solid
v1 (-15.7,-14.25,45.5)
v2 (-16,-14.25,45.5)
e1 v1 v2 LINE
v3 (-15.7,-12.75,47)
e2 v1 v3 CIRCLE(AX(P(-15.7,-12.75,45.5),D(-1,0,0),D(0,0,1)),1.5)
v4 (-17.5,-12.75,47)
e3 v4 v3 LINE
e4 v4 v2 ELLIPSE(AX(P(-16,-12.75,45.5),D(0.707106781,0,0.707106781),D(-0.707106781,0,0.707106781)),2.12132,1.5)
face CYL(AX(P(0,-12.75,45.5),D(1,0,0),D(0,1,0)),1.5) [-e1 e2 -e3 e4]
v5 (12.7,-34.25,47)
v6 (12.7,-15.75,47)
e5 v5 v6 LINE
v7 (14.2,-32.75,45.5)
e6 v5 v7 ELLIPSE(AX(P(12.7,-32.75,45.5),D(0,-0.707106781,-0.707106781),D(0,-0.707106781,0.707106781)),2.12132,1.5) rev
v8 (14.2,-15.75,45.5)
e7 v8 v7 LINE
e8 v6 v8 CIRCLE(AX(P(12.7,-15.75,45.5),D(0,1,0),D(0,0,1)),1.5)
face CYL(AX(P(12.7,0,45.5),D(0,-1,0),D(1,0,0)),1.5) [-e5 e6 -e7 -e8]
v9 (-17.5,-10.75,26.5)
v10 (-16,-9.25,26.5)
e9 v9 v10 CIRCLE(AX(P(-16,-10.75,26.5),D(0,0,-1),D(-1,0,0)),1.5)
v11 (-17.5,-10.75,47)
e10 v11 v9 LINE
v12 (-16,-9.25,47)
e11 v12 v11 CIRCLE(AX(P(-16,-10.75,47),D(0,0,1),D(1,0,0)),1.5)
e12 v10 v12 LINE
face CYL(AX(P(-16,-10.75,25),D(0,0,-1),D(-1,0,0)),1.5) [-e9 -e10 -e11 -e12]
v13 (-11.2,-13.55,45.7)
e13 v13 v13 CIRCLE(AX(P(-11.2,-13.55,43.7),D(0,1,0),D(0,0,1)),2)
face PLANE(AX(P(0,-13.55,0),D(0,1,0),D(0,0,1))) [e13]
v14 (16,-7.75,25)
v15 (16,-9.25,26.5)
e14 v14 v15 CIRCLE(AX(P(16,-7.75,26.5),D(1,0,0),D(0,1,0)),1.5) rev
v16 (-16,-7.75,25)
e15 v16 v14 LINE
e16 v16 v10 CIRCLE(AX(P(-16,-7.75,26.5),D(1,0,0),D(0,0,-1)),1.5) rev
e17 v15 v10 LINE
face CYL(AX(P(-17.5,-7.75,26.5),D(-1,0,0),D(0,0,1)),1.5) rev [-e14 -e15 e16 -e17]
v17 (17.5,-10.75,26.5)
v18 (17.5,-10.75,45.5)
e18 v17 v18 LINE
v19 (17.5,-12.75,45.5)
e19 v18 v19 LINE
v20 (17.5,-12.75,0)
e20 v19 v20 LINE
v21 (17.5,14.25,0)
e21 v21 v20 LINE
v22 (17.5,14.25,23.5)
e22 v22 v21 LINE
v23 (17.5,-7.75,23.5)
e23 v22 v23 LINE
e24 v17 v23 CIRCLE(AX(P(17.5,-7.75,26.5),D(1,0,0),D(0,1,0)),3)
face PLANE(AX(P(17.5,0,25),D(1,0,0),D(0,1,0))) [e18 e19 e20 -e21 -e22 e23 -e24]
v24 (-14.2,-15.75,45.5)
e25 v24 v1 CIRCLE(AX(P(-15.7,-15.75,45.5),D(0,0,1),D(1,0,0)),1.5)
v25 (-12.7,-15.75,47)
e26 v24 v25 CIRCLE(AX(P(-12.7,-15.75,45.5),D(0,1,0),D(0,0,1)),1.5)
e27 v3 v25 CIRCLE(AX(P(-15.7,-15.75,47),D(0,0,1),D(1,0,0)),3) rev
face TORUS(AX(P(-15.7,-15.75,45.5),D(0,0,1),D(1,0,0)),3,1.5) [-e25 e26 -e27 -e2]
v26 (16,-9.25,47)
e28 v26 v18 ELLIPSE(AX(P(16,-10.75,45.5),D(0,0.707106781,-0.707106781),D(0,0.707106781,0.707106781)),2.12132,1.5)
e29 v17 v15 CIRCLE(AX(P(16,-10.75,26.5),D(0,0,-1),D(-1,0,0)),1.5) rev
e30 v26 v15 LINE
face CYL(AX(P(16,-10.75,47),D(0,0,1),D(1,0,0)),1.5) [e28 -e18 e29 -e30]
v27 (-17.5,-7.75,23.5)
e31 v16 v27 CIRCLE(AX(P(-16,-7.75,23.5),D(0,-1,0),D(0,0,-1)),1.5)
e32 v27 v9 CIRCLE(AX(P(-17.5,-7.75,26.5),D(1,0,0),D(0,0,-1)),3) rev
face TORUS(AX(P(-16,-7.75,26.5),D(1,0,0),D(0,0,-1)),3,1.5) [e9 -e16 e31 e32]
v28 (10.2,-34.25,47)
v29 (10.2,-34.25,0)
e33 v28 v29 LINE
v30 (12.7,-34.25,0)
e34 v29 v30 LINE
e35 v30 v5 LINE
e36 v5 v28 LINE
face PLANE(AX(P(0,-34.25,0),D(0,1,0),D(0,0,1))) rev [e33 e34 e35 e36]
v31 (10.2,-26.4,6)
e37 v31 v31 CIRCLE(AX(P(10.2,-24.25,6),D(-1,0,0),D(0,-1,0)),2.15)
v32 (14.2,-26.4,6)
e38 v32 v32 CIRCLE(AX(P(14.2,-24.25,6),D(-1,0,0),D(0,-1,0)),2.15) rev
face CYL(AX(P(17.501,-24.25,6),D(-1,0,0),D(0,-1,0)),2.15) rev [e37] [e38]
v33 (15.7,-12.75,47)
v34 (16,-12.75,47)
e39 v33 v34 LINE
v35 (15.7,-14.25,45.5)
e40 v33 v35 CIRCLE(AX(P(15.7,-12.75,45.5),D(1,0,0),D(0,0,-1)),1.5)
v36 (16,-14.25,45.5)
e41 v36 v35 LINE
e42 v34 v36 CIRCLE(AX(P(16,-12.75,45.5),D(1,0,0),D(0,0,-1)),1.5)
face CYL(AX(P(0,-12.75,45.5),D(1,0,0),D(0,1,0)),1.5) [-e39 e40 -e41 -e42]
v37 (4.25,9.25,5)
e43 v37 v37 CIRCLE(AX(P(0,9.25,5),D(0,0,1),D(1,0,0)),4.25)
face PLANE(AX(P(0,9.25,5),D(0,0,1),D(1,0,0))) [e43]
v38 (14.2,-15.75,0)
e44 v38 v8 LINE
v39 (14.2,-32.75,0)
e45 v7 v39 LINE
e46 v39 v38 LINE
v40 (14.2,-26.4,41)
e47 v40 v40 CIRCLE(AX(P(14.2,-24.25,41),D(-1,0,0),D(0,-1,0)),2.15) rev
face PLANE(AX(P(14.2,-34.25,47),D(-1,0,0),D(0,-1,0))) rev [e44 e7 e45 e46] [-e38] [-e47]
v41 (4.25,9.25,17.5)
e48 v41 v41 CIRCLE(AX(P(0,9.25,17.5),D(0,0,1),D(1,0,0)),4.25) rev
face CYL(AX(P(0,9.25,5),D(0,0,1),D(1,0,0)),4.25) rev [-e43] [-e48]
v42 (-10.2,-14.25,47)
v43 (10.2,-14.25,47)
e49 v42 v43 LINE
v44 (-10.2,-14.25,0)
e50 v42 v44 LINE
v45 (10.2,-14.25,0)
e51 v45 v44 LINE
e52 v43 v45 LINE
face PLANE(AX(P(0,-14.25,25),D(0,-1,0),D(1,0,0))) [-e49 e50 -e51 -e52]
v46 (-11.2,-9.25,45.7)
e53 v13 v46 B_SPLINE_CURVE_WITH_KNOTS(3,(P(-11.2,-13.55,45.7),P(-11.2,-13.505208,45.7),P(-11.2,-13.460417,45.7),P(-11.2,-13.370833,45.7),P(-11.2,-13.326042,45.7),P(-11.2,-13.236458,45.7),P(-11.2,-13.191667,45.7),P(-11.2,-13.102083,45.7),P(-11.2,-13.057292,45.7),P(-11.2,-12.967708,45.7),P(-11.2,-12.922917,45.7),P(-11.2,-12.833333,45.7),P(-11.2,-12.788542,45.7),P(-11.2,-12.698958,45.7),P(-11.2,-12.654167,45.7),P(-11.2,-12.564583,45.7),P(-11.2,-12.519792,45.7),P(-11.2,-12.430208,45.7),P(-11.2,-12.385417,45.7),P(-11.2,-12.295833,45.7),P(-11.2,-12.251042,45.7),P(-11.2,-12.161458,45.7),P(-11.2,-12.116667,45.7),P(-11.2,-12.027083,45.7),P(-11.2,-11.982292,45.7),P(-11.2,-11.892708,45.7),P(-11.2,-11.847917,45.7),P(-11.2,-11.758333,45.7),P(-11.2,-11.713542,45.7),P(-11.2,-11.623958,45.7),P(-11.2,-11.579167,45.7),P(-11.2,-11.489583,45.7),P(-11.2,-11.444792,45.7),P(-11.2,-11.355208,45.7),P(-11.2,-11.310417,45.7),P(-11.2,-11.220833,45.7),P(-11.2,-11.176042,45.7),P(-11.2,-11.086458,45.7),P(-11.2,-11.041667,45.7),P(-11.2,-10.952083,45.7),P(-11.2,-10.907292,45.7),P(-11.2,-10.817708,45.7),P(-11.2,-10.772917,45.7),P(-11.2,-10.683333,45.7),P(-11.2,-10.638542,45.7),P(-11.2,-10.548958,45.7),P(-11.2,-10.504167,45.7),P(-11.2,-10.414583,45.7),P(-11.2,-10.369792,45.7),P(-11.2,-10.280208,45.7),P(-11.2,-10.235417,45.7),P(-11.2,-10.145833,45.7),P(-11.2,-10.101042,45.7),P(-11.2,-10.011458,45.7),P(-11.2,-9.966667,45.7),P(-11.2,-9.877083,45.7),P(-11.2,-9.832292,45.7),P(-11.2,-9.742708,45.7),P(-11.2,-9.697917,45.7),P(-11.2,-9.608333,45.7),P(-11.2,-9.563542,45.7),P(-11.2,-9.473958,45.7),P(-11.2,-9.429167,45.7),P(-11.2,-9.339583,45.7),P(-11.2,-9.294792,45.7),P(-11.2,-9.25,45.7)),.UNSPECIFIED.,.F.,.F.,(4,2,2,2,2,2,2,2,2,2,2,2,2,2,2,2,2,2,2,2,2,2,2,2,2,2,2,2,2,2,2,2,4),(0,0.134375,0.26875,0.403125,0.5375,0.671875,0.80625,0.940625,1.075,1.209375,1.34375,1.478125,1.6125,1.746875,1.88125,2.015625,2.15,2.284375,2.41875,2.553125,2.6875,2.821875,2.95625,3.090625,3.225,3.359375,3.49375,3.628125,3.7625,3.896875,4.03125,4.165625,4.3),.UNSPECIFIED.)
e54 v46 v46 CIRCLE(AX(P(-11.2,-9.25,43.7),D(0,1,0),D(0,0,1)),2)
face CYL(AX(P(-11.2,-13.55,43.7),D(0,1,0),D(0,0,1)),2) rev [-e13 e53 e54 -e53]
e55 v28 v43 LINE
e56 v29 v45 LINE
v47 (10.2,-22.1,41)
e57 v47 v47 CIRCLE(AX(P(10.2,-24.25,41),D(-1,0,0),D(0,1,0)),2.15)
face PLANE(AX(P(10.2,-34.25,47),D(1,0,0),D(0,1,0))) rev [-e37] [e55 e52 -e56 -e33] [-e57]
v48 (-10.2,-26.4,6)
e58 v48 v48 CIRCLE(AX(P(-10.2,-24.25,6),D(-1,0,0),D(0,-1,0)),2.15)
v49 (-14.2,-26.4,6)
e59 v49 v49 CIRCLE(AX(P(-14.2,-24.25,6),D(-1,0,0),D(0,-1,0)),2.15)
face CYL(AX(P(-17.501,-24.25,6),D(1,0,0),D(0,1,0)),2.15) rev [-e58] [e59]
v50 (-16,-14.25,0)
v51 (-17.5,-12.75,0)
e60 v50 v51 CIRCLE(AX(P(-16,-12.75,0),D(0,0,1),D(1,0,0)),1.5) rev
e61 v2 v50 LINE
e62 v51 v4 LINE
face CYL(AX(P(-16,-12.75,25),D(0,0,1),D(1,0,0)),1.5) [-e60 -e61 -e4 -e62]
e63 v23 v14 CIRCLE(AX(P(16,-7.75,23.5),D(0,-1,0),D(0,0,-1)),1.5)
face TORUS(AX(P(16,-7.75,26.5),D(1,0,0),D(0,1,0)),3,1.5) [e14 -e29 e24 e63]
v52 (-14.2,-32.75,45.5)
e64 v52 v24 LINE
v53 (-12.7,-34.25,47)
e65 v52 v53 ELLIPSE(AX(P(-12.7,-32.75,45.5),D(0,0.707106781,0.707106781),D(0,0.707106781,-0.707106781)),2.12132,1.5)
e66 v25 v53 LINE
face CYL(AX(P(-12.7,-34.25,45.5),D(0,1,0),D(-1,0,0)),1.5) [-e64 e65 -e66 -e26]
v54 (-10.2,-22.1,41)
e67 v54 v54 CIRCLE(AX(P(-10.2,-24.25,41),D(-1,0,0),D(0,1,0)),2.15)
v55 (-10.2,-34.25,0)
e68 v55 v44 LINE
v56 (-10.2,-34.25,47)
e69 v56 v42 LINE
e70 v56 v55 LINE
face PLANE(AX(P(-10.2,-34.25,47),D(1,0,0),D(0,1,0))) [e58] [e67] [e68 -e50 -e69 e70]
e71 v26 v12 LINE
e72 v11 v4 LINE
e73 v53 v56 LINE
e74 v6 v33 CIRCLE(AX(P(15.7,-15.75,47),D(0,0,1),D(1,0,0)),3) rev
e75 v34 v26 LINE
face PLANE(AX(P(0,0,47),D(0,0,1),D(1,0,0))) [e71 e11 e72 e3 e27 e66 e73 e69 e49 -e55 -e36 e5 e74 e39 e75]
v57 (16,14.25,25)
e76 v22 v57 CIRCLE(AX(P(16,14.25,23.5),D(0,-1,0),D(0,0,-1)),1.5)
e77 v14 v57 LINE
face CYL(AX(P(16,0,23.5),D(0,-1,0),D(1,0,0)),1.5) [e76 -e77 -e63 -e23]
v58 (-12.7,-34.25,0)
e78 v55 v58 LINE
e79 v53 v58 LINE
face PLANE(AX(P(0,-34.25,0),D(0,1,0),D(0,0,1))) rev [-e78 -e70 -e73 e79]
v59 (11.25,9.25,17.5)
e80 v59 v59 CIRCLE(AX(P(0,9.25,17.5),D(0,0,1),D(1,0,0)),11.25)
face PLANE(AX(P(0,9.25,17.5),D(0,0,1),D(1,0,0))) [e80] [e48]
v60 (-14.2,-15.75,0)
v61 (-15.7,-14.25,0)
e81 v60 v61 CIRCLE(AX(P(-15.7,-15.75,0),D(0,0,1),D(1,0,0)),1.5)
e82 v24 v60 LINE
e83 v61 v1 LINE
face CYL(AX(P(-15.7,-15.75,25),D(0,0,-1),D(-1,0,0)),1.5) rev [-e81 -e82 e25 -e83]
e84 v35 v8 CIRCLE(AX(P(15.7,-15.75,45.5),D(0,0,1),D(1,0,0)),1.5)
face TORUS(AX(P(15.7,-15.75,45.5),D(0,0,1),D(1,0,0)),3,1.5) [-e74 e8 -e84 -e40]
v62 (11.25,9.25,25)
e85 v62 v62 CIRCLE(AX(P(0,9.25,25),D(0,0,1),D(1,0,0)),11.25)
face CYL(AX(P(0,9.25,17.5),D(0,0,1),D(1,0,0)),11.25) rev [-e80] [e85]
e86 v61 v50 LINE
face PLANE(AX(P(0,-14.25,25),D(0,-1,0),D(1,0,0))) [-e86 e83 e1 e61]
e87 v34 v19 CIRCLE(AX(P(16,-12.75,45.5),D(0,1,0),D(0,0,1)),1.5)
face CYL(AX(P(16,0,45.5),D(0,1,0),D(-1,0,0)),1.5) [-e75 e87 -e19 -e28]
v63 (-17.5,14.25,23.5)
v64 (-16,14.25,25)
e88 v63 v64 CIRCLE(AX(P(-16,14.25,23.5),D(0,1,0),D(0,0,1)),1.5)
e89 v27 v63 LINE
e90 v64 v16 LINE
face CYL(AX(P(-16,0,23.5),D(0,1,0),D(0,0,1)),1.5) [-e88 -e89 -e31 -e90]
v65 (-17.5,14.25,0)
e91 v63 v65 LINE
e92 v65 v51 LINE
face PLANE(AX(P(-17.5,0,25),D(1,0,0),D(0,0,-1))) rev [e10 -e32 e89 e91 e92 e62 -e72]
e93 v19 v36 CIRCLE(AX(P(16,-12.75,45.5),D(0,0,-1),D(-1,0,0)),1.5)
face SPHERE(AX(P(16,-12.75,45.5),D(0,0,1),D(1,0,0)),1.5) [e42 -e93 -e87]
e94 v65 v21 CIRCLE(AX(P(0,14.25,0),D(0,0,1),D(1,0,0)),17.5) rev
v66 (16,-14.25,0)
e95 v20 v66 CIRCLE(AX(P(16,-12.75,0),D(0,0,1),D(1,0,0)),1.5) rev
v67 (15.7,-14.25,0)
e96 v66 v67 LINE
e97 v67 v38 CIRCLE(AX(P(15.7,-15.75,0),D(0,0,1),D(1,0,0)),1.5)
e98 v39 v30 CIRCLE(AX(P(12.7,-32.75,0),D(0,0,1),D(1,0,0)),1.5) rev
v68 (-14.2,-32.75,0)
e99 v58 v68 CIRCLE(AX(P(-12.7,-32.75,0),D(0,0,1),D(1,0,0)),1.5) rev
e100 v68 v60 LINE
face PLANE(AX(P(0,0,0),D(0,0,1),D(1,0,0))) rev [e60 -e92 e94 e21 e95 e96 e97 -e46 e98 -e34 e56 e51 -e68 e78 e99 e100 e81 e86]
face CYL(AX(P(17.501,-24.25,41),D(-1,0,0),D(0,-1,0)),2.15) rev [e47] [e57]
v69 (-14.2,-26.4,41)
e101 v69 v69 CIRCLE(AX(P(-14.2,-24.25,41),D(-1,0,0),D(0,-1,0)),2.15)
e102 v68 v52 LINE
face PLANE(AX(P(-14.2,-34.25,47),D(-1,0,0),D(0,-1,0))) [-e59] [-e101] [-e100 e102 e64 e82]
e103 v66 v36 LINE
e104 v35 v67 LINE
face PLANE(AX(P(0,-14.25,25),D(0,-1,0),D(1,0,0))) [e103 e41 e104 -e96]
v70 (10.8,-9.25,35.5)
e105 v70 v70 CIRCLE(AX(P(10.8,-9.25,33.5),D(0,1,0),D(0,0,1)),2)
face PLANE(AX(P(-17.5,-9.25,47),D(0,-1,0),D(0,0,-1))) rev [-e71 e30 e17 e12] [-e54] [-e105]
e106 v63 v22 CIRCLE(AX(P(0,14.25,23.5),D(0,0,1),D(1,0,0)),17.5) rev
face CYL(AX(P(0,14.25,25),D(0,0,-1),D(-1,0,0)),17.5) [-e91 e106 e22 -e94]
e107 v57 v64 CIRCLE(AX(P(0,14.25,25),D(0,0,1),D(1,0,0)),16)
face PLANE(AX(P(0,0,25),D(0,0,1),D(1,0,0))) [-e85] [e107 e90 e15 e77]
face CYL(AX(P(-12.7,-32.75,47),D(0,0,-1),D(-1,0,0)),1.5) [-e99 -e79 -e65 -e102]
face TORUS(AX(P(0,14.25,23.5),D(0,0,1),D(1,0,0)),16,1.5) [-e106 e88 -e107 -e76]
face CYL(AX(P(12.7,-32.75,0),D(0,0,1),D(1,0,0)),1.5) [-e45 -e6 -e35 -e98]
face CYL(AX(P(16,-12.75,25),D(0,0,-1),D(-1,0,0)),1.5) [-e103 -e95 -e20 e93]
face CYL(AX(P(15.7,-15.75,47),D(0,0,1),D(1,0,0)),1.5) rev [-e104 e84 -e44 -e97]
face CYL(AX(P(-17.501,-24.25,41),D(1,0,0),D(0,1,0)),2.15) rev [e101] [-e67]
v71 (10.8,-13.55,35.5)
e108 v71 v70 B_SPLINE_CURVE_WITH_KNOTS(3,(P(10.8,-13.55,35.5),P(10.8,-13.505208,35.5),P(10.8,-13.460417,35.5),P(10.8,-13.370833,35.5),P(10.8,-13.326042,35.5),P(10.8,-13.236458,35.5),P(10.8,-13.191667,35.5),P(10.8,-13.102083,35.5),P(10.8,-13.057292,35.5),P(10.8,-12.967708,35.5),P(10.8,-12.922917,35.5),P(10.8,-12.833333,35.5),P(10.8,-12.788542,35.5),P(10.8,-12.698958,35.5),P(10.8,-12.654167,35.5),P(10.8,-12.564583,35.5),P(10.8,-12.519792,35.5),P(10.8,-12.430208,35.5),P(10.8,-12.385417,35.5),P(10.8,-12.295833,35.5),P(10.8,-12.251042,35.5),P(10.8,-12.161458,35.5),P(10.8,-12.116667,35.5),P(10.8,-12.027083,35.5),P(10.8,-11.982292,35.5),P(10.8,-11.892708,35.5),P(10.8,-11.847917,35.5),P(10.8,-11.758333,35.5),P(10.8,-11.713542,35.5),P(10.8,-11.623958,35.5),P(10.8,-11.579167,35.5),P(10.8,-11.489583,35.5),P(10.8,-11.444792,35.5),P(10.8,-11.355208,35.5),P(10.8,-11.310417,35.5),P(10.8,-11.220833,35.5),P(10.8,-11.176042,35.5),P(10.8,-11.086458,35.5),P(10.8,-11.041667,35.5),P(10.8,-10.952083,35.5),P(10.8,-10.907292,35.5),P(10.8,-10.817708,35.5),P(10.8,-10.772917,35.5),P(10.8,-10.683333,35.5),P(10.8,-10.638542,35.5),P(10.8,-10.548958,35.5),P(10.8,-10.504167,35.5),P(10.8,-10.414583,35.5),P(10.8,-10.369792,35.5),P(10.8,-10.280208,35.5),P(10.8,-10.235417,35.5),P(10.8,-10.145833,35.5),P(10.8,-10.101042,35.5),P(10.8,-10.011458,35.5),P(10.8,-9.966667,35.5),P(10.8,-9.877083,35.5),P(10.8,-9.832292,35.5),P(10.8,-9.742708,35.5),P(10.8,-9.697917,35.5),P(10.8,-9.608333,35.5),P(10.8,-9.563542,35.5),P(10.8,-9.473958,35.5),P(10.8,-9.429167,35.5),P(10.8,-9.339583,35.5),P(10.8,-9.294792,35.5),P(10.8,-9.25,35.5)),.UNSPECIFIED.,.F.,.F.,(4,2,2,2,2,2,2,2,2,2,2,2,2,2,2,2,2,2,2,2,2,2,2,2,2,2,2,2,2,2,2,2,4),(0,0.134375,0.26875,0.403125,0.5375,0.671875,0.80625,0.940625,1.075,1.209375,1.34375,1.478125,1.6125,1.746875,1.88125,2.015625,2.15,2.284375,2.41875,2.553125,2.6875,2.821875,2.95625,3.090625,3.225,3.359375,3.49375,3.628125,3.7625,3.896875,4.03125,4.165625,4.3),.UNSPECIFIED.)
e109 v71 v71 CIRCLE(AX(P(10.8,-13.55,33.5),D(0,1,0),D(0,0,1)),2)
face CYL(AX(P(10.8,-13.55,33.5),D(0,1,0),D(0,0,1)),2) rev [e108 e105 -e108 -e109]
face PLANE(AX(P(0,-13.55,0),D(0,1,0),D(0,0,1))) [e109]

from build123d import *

# Parameters (mm, degrees)
SKETCH1_W           = 35
SKETCH1_H           = 28.5
BOSS_EXTRUDE1_DEPTH = 25
SKETCH2_R           = 4.25
CUT_EXTRUDE1_DEPTH  = 20
SKETCH3_R           = 11.25
CUT_EXTRUDE2_DEPTH  = 7.5
SKETCH9_W           = 35
SKETCH9_H           = 5
BOSS_EXTRUDE4_DEPTH = 22
SKETCH4_W           = 4
SKETCH4_H           = 47
BOSS_EXTRUDE2_DEPTH = 20
FILLET1_R           = 1.5
CUT_EXTRUDE3_REACH  = 66.415
SKETCH6_R           = 2.15
MIRROR1_START       = -14.2
MIRROR1_OUTLINE_W   = 20
MIRROR1_OUTLINE_H   = 47
MIRROR1_OUTLINE_R   = 2.15
MIRROR1_DEPTH       = 4
MIRROR1_2_DEPTH     = 47
FILLET2_R           = 1.5
SKETCH10_R          = 2
CUT_EXTRUDE4_DEPTH  = 4.3


with BuildPart() as part:
    # Sketch1 → Boss-Extrude1 (new body)
    with BuildSketch(Plane.XY):
        with BuildLine():
            ThreePointArc((-17.5, 14.25), (0, 31.75), (17.5, 14.25))
            Line((17.5, 14.25), (-17.5, 14.25))
        make_face()
        Rectangle(SKETCH1_W, SKETCH1_H)
    extrude(amount=BOSS_EXTRUDE1_DEPTH)

    # Sketch2 → Cut-Extrude1 (cut)
    with BuildSketch(Plane.XY.offset(25)):
        with Locations((0, 9.25)):
            Circle(SKETCH2_R)
    extrude(amount=-CUT_EXTRUDE1_DEPTH, mode=Mode.SUBTRACT)

    # Sketch3 → Cut-Extrude2 (cut)
    with BuildSketch(Plane.XY.offset(25)):
        with Locations((0, 9.25)):
            Circle(SKETCH3_R)
    extrude(amount=-CUT_EXTRUDE2_DEPTH, mode=Mode.SUBTRACT)

    # Sketch9 → Boss-Extrude4 (add)
    with BuildSketch(Plane.XY.offset(25)):
        with Locations((0, -11.75)):
            Rectangle(SKETCH9_W, SKETCH9_H)
    extrude(amount=BOSS_EXTRUDE4_DEPTH)

    # Sketch4 → Boss-Extrude2 (add)
    with BuildSketch(Plane.XZ.offset(14.25)):
        with Locations((12.2, 23.5)):
            Rectangle(SKETCH4_W, SKETCH4_H)
    extrude(amount=BOSS_EXTRUDE2_DEPTH)

    # Fillet1
    fillet1_edges = [part.edges().sort_by_distance(p)[0] for p in [
        (14.2, -14.25, 23.5),
        (17.5, -14.25, 23.5),
    ]]
    fillet(fillet1_edges, radius=FILLET1_R)

    # Sketch6 → Cut-Extrude3 (cut, up to next)
    with BuildSketch(Plane.ZY.offset(-10.2), mode=Mode.PRIVATE) as cut_extrude3_sk1:
        with Locations(Location((6, -24.25, 0), (0, 0, 270))):
            Circle(SKETCH6_R)
    cut_extrude3_tool1 = extrude(cut_extrude3_sk1.sketch, amount=-CUT_EXTRUDE3_REACH, mode=Mode.PRIVATE) & part.part
    # Sketch6 → Cut-Extrude3 (cut, up to next)
    with BuildSketch(Plane.ZY.offset(-10.2), mode=Mode.PRIVATE) as cut_extrude3_sk2:
        with Locations(Location((41, -24.25, 0), (0, 0, 270))):
            Circle(SKETCH6_R)
    cut_extrude3_tool2 = extrude(cut_extrude3_sk2.sketch, amount=-CUT_EXTRUDE3_REACH, mode=Mode.PRIVATE) & part.part
    add(cut_extrude3_tool1.solids().sort_by_distance((10.2, -24.25, 6))[0], mode=Mode.SUBTRACT)
    add(cut_extrude3_tool2.solids().sort_by_distance((10.2, -24.25, 41))[0], mode=Mode.SUBTRACT)

    # Mirror1: read off the stored shape, not the designer's step
    # Mirror1 outline → Mirror1 (add)
    with BuildSketch(Plane.YZ.offset(MIRROR1_START)):
        with Locations((-24.25, 23.5)):
            Rectangle(MIRROR1_OUTLINE_W, MIRROR1_OUTLINE_H)
        with Locations((-24.25, 6)):
            Circle(MIRROR1_OUTLINE_R, mode=Mode.SUBTRACT)
        with Locations((-24.25, 41)):
            Circle(MIRROR1_OUTLINE_R, mode=Mode.SUBTRACT)
    extrude(amount=MIRROR1_DEPTH)

    # Mirror1 2 outline → Mirror1 2 (add)
    with BuildSketch(Plane.XY):
        with BuildLine():
            Line((-14.2, -14.25), (-15.7, -14.25))
            ThreePointArc((-15.7, -14.25), (-14.639339828, -14.689339828), (-14.2, -15.75))
            Line((-14.2, -15.75), (-14.2, -14.25))
        make_face()
    extrude(amount=MIRROR1_2_DEPTH)

    # Fillet2
    fillet2_edges = [part.edges().sort_by_distance(p)[0] for p in [
        (-17.5, 2.5, 25),
        (17.5, 2.5, 25),
        (-17.5, -9.25, 36),
        (0, -9.25, 25),
        (17.5, -9.25, 36),
        (-16.6, -14.25, 47),
        (14.2, -25, 47),
        (14.2, -34.25, 23.5),
        (0, 31.75, 25),
        (17.5, -11, 47),
        (15.85, -14.25, 47),
        (17.060660172, -13.810660172, 47),
        (14.639339828, -14.689339828, 47),
        (-14.2, -34.25, 23.5),
        (-14.2, -25, 47),
        (-14.639339828, -14.689339828, 47),
        (-17.5, -14.25, 23.5),
    ]]
    fillet(fillet2_edges, radius=FILLET2_R)

    # Sketch10 → Cut-Extrude4 (cut)
    with BuildSketch(Plane(origin=(0, -9.25, 0), x_dir=(1, 0, 0), z_dir=(0, 1, 0))):
        with Locations(Location((10.8, -33.5, 0), (0, 0, 270))):
            Circle(SKETCH10_R)
        with Locations(Location((-11.2, -43.7, 0), (0, 0, 270))):
            Circle(SKETCH10_R)
    extrude(amount=-CUT_EXTRUDE4_DEPTH, mode=Mode.SUBTRACT)


solid = part.part
